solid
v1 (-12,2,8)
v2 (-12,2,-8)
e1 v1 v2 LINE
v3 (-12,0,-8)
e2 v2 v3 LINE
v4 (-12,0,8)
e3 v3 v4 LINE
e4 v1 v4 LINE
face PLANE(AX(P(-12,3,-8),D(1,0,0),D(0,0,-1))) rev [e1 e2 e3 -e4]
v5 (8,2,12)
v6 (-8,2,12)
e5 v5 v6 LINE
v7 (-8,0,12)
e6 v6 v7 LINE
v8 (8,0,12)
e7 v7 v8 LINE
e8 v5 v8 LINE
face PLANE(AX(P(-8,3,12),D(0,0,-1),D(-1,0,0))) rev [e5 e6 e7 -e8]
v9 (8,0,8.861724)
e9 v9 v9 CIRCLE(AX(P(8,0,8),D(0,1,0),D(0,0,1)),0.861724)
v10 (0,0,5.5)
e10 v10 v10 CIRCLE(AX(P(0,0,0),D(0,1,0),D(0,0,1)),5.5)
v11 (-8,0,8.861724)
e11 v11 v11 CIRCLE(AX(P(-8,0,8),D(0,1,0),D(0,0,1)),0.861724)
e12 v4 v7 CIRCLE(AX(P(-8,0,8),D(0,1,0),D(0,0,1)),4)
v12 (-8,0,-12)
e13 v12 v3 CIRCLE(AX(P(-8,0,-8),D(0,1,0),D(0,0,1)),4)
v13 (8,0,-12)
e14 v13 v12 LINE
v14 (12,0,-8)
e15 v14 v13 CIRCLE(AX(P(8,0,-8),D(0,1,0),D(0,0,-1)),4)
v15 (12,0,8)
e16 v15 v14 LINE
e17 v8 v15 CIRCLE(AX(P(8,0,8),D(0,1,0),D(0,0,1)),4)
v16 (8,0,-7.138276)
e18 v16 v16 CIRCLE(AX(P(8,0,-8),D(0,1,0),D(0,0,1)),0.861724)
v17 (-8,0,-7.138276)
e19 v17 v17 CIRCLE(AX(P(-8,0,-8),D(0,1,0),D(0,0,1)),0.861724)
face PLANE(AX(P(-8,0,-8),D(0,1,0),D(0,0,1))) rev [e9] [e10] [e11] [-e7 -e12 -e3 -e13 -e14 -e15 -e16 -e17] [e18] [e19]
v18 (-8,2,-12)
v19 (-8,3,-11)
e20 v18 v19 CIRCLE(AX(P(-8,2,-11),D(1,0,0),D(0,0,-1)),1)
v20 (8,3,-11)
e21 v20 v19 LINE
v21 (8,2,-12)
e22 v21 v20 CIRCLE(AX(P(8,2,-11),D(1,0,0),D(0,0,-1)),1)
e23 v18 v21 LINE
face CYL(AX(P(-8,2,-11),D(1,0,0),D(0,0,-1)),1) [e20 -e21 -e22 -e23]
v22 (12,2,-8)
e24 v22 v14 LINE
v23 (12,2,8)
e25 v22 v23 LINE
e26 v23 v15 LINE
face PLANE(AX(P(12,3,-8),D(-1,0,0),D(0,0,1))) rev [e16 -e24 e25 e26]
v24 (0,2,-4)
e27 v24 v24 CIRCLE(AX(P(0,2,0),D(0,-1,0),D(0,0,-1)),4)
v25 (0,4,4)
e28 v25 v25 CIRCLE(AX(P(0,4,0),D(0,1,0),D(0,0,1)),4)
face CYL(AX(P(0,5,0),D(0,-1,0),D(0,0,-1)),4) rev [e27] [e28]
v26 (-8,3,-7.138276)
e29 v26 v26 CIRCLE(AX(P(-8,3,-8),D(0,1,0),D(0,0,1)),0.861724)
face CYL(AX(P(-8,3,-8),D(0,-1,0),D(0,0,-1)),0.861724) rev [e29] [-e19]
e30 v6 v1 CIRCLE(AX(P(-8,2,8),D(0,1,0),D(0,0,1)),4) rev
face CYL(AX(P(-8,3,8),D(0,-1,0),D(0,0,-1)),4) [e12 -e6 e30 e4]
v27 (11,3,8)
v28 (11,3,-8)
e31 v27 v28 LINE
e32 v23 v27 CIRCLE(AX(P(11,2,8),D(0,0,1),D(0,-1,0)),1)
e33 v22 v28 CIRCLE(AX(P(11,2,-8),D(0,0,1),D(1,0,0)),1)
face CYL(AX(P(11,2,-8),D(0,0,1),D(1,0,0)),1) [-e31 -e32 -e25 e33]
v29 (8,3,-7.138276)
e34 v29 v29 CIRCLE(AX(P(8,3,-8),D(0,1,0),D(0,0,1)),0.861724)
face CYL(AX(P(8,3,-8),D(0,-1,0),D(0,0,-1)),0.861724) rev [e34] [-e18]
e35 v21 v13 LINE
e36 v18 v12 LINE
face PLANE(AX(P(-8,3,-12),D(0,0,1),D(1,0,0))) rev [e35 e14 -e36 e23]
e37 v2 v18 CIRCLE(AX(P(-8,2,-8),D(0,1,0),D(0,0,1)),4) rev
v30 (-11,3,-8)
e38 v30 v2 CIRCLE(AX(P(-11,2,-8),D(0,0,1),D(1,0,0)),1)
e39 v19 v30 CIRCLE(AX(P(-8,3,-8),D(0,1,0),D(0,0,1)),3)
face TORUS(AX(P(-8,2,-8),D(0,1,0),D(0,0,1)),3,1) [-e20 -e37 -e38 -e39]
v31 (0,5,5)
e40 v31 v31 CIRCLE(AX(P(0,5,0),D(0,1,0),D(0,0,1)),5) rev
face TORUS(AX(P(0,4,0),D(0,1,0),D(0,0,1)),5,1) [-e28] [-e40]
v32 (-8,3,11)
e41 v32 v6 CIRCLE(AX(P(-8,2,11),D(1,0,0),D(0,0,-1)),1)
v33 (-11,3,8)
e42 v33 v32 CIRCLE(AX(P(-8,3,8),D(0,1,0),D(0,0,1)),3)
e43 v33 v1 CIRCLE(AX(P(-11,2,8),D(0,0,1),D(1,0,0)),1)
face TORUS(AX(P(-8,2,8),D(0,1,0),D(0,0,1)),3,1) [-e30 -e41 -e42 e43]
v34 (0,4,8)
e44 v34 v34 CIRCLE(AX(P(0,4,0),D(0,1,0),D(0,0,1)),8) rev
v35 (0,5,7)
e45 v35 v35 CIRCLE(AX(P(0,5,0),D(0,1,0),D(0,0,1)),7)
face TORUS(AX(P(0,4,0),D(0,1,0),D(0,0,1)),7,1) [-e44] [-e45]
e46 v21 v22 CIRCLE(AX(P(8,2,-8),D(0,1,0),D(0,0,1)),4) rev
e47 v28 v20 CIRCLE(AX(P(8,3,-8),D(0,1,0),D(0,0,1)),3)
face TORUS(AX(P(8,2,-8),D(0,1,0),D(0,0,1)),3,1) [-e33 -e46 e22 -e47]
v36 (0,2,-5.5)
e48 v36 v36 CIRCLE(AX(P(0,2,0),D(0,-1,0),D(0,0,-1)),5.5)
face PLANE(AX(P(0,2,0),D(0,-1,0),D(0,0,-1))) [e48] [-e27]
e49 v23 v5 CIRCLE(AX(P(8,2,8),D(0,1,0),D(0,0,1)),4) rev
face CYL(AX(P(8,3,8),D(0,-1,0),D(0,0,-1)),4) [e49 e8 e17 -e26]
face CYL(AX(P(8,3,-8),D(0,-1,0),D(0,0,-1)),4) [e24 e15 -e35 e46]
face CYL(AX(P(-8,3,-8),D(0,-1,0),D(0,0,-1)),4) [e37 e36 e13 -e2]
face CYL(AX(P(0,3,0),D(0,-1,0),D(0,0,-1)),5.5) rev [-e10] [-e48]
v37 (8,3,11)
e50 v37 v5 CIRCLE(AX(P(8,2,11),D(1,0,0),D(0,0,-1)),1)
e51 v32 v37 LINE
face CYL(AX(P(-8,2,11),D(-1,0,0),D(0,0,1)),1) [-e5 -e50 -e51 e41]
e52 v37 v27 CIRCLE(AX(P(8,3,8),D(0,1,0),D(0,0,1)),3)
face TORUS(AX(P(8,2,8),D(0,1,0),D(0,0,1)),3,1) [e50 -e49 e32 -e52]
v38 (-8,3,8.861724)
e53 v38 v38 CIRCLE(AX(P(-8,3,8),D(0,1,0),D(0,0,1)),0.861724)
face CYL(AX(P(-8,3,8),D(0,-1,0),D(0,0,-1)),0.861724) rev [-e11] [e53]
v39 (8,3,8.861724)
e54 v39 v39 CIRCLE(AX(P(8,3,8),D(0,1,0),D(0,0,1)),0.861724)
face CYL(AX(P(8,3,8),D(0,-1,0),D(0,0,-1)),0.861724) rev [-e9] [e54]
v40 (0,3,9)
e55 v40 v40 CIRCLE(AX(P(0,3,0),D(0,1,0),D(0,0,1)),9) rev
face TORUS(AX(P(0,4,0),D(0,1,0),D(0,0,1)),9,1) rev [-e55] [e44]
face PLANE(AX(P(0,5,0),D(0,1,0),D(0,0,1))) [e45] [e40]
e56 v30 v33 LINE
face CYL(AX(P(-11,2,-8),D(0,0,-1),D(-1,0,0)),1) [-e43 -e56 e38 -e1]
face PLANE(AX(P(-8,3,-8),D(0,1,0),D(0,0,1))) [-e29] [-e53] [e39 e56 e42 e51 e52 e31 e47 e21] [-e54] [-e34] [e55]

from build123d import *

# Parameters (mm, degrees)
SKETCH1_R           = 0.861723991
SKETCH1_R_2         = 5.5
BOSS_EXTRUDE1_DEPTH = 3
SKETCH2_R           = 8
SKETCH2_R_2         = 4
BOSS_EXTRUDE2_DEPTH = 2
FILLET1_R           = 1
BOSS_EXTRUDE3_START = 1
SKETCH3_R           = 5.5
SKETCH3_R_2         = 4
BOSS_EXTRUDE3_DEPTH = 1


with BuildPart() as part:
    # Sketch1 → Boss-Extrude1 (new body)
    with BuildSketch(Plane(origin=(0, 0, 0), x_dir=(1, 0, 0), z_dir=(0, 1, 0))):
        with BuildLine():
            Line((-8, 12), (8, 12))
            ThreePointArc((8, 12), (10.828427125, 10.828427125), (12, 8))
            Line((12, 8), (12, -8))
            ThreePointArc((12, -8), (10.828427125, -10.828427125), (8, -12))
            Line((8, -12), (-8, -12))
            ThreePointArc((-8, -12), (-10.828427125, -10.828427125), (-12, -8))
            Line((-12, -8), (-12, 8))
            ThreePointArc((-12, 8), (-10.828427125, 10.828427125), (-8, 12))
        make_face()
        with Locations(Location((-8, 8, 0), (0, 0, 270))):
            Circle(SKETCH1_R, mode=Mode.SUBTRACT)
        with Locations(Location((8, 8, 0), (0, 0, 270))):
            Circle(SKETCH1_R, mode=Mode.SUBTRACT)
        with Locations(Location((8, -8, 0), (0, 0, 270))):
            Circle(SKETCH1_R, mode=Mode.SUBTRACT)
        with Locations(Location((-8, -8, 0), (0, 0, 270))):
            Circle(SKETCH1_R, mode=Mode.SUBTRACT)
        with Locations(Location((0, 0, 0), (0, 0, 270))):
            Circle(SKETCH1_R_2, mode=Mode.SUBTRACT)
    extrude(amount=BOSS_EXTRUDE1_DEPTH)

    # Sketch2 → Boss-Extrude2 (add)
    with BuildSketch(Plane(origin=(0, 3, 0), x_dir=(1, 0, 0), z_dir=(0, 1, 0))):
        with Locations(Location((0, 0, 0), (0, 0, 270))):
            Circle(SKETCH2_R)
        with Locations(Location((0, 0, 0), (0, 0, 270))):
            Circle(SKETCH2_R_2, mode=Mode.SUBTRACT)
    extrude(amount=BOSS_EXTRUDE2_DEPTH)

    # Fillet1
    fillet1_edges = [part.edges().sort_by_distance(p)[0] for p in [
        (-10.828427125, 3, 10.828427125),
        (0, 3, 12),
        (10.828427125, 3, 10.828427125),
        (12, 3, 0),
        (10.828427125, 3, -10.828427125),
        (0, 3, -12),
        (-10.828427125, 3, -10.828427125),
        (0, 5, -8),
        (0, 3, -8),
        (0, 5, -4),
        (-12, 3, 0),
    ]]
    fillet(fillet1_edges, radius=FILLET1_R - 0.0001)  # a hair under: the kernel refuses the full size

    # Sketch3 → Boss-Extrude3 (add)
    with BuildSketch(Plane.XZ.offset(-3).offset(BOSS_EXTRUDE3_START)):
        with Locations(Location((0, 0, 0), (0, 0, 270))):
            Circle(SKETCH3_R)
        with Locations(Location((0, 0, 0), (0, 0, 270))):
            Circle(SKETCH3_R_2, mode=Mode.SUBTRACT)
    extrude(amount=-BOSS_EXTRUDE3_DEPTH)


solid = part.part
